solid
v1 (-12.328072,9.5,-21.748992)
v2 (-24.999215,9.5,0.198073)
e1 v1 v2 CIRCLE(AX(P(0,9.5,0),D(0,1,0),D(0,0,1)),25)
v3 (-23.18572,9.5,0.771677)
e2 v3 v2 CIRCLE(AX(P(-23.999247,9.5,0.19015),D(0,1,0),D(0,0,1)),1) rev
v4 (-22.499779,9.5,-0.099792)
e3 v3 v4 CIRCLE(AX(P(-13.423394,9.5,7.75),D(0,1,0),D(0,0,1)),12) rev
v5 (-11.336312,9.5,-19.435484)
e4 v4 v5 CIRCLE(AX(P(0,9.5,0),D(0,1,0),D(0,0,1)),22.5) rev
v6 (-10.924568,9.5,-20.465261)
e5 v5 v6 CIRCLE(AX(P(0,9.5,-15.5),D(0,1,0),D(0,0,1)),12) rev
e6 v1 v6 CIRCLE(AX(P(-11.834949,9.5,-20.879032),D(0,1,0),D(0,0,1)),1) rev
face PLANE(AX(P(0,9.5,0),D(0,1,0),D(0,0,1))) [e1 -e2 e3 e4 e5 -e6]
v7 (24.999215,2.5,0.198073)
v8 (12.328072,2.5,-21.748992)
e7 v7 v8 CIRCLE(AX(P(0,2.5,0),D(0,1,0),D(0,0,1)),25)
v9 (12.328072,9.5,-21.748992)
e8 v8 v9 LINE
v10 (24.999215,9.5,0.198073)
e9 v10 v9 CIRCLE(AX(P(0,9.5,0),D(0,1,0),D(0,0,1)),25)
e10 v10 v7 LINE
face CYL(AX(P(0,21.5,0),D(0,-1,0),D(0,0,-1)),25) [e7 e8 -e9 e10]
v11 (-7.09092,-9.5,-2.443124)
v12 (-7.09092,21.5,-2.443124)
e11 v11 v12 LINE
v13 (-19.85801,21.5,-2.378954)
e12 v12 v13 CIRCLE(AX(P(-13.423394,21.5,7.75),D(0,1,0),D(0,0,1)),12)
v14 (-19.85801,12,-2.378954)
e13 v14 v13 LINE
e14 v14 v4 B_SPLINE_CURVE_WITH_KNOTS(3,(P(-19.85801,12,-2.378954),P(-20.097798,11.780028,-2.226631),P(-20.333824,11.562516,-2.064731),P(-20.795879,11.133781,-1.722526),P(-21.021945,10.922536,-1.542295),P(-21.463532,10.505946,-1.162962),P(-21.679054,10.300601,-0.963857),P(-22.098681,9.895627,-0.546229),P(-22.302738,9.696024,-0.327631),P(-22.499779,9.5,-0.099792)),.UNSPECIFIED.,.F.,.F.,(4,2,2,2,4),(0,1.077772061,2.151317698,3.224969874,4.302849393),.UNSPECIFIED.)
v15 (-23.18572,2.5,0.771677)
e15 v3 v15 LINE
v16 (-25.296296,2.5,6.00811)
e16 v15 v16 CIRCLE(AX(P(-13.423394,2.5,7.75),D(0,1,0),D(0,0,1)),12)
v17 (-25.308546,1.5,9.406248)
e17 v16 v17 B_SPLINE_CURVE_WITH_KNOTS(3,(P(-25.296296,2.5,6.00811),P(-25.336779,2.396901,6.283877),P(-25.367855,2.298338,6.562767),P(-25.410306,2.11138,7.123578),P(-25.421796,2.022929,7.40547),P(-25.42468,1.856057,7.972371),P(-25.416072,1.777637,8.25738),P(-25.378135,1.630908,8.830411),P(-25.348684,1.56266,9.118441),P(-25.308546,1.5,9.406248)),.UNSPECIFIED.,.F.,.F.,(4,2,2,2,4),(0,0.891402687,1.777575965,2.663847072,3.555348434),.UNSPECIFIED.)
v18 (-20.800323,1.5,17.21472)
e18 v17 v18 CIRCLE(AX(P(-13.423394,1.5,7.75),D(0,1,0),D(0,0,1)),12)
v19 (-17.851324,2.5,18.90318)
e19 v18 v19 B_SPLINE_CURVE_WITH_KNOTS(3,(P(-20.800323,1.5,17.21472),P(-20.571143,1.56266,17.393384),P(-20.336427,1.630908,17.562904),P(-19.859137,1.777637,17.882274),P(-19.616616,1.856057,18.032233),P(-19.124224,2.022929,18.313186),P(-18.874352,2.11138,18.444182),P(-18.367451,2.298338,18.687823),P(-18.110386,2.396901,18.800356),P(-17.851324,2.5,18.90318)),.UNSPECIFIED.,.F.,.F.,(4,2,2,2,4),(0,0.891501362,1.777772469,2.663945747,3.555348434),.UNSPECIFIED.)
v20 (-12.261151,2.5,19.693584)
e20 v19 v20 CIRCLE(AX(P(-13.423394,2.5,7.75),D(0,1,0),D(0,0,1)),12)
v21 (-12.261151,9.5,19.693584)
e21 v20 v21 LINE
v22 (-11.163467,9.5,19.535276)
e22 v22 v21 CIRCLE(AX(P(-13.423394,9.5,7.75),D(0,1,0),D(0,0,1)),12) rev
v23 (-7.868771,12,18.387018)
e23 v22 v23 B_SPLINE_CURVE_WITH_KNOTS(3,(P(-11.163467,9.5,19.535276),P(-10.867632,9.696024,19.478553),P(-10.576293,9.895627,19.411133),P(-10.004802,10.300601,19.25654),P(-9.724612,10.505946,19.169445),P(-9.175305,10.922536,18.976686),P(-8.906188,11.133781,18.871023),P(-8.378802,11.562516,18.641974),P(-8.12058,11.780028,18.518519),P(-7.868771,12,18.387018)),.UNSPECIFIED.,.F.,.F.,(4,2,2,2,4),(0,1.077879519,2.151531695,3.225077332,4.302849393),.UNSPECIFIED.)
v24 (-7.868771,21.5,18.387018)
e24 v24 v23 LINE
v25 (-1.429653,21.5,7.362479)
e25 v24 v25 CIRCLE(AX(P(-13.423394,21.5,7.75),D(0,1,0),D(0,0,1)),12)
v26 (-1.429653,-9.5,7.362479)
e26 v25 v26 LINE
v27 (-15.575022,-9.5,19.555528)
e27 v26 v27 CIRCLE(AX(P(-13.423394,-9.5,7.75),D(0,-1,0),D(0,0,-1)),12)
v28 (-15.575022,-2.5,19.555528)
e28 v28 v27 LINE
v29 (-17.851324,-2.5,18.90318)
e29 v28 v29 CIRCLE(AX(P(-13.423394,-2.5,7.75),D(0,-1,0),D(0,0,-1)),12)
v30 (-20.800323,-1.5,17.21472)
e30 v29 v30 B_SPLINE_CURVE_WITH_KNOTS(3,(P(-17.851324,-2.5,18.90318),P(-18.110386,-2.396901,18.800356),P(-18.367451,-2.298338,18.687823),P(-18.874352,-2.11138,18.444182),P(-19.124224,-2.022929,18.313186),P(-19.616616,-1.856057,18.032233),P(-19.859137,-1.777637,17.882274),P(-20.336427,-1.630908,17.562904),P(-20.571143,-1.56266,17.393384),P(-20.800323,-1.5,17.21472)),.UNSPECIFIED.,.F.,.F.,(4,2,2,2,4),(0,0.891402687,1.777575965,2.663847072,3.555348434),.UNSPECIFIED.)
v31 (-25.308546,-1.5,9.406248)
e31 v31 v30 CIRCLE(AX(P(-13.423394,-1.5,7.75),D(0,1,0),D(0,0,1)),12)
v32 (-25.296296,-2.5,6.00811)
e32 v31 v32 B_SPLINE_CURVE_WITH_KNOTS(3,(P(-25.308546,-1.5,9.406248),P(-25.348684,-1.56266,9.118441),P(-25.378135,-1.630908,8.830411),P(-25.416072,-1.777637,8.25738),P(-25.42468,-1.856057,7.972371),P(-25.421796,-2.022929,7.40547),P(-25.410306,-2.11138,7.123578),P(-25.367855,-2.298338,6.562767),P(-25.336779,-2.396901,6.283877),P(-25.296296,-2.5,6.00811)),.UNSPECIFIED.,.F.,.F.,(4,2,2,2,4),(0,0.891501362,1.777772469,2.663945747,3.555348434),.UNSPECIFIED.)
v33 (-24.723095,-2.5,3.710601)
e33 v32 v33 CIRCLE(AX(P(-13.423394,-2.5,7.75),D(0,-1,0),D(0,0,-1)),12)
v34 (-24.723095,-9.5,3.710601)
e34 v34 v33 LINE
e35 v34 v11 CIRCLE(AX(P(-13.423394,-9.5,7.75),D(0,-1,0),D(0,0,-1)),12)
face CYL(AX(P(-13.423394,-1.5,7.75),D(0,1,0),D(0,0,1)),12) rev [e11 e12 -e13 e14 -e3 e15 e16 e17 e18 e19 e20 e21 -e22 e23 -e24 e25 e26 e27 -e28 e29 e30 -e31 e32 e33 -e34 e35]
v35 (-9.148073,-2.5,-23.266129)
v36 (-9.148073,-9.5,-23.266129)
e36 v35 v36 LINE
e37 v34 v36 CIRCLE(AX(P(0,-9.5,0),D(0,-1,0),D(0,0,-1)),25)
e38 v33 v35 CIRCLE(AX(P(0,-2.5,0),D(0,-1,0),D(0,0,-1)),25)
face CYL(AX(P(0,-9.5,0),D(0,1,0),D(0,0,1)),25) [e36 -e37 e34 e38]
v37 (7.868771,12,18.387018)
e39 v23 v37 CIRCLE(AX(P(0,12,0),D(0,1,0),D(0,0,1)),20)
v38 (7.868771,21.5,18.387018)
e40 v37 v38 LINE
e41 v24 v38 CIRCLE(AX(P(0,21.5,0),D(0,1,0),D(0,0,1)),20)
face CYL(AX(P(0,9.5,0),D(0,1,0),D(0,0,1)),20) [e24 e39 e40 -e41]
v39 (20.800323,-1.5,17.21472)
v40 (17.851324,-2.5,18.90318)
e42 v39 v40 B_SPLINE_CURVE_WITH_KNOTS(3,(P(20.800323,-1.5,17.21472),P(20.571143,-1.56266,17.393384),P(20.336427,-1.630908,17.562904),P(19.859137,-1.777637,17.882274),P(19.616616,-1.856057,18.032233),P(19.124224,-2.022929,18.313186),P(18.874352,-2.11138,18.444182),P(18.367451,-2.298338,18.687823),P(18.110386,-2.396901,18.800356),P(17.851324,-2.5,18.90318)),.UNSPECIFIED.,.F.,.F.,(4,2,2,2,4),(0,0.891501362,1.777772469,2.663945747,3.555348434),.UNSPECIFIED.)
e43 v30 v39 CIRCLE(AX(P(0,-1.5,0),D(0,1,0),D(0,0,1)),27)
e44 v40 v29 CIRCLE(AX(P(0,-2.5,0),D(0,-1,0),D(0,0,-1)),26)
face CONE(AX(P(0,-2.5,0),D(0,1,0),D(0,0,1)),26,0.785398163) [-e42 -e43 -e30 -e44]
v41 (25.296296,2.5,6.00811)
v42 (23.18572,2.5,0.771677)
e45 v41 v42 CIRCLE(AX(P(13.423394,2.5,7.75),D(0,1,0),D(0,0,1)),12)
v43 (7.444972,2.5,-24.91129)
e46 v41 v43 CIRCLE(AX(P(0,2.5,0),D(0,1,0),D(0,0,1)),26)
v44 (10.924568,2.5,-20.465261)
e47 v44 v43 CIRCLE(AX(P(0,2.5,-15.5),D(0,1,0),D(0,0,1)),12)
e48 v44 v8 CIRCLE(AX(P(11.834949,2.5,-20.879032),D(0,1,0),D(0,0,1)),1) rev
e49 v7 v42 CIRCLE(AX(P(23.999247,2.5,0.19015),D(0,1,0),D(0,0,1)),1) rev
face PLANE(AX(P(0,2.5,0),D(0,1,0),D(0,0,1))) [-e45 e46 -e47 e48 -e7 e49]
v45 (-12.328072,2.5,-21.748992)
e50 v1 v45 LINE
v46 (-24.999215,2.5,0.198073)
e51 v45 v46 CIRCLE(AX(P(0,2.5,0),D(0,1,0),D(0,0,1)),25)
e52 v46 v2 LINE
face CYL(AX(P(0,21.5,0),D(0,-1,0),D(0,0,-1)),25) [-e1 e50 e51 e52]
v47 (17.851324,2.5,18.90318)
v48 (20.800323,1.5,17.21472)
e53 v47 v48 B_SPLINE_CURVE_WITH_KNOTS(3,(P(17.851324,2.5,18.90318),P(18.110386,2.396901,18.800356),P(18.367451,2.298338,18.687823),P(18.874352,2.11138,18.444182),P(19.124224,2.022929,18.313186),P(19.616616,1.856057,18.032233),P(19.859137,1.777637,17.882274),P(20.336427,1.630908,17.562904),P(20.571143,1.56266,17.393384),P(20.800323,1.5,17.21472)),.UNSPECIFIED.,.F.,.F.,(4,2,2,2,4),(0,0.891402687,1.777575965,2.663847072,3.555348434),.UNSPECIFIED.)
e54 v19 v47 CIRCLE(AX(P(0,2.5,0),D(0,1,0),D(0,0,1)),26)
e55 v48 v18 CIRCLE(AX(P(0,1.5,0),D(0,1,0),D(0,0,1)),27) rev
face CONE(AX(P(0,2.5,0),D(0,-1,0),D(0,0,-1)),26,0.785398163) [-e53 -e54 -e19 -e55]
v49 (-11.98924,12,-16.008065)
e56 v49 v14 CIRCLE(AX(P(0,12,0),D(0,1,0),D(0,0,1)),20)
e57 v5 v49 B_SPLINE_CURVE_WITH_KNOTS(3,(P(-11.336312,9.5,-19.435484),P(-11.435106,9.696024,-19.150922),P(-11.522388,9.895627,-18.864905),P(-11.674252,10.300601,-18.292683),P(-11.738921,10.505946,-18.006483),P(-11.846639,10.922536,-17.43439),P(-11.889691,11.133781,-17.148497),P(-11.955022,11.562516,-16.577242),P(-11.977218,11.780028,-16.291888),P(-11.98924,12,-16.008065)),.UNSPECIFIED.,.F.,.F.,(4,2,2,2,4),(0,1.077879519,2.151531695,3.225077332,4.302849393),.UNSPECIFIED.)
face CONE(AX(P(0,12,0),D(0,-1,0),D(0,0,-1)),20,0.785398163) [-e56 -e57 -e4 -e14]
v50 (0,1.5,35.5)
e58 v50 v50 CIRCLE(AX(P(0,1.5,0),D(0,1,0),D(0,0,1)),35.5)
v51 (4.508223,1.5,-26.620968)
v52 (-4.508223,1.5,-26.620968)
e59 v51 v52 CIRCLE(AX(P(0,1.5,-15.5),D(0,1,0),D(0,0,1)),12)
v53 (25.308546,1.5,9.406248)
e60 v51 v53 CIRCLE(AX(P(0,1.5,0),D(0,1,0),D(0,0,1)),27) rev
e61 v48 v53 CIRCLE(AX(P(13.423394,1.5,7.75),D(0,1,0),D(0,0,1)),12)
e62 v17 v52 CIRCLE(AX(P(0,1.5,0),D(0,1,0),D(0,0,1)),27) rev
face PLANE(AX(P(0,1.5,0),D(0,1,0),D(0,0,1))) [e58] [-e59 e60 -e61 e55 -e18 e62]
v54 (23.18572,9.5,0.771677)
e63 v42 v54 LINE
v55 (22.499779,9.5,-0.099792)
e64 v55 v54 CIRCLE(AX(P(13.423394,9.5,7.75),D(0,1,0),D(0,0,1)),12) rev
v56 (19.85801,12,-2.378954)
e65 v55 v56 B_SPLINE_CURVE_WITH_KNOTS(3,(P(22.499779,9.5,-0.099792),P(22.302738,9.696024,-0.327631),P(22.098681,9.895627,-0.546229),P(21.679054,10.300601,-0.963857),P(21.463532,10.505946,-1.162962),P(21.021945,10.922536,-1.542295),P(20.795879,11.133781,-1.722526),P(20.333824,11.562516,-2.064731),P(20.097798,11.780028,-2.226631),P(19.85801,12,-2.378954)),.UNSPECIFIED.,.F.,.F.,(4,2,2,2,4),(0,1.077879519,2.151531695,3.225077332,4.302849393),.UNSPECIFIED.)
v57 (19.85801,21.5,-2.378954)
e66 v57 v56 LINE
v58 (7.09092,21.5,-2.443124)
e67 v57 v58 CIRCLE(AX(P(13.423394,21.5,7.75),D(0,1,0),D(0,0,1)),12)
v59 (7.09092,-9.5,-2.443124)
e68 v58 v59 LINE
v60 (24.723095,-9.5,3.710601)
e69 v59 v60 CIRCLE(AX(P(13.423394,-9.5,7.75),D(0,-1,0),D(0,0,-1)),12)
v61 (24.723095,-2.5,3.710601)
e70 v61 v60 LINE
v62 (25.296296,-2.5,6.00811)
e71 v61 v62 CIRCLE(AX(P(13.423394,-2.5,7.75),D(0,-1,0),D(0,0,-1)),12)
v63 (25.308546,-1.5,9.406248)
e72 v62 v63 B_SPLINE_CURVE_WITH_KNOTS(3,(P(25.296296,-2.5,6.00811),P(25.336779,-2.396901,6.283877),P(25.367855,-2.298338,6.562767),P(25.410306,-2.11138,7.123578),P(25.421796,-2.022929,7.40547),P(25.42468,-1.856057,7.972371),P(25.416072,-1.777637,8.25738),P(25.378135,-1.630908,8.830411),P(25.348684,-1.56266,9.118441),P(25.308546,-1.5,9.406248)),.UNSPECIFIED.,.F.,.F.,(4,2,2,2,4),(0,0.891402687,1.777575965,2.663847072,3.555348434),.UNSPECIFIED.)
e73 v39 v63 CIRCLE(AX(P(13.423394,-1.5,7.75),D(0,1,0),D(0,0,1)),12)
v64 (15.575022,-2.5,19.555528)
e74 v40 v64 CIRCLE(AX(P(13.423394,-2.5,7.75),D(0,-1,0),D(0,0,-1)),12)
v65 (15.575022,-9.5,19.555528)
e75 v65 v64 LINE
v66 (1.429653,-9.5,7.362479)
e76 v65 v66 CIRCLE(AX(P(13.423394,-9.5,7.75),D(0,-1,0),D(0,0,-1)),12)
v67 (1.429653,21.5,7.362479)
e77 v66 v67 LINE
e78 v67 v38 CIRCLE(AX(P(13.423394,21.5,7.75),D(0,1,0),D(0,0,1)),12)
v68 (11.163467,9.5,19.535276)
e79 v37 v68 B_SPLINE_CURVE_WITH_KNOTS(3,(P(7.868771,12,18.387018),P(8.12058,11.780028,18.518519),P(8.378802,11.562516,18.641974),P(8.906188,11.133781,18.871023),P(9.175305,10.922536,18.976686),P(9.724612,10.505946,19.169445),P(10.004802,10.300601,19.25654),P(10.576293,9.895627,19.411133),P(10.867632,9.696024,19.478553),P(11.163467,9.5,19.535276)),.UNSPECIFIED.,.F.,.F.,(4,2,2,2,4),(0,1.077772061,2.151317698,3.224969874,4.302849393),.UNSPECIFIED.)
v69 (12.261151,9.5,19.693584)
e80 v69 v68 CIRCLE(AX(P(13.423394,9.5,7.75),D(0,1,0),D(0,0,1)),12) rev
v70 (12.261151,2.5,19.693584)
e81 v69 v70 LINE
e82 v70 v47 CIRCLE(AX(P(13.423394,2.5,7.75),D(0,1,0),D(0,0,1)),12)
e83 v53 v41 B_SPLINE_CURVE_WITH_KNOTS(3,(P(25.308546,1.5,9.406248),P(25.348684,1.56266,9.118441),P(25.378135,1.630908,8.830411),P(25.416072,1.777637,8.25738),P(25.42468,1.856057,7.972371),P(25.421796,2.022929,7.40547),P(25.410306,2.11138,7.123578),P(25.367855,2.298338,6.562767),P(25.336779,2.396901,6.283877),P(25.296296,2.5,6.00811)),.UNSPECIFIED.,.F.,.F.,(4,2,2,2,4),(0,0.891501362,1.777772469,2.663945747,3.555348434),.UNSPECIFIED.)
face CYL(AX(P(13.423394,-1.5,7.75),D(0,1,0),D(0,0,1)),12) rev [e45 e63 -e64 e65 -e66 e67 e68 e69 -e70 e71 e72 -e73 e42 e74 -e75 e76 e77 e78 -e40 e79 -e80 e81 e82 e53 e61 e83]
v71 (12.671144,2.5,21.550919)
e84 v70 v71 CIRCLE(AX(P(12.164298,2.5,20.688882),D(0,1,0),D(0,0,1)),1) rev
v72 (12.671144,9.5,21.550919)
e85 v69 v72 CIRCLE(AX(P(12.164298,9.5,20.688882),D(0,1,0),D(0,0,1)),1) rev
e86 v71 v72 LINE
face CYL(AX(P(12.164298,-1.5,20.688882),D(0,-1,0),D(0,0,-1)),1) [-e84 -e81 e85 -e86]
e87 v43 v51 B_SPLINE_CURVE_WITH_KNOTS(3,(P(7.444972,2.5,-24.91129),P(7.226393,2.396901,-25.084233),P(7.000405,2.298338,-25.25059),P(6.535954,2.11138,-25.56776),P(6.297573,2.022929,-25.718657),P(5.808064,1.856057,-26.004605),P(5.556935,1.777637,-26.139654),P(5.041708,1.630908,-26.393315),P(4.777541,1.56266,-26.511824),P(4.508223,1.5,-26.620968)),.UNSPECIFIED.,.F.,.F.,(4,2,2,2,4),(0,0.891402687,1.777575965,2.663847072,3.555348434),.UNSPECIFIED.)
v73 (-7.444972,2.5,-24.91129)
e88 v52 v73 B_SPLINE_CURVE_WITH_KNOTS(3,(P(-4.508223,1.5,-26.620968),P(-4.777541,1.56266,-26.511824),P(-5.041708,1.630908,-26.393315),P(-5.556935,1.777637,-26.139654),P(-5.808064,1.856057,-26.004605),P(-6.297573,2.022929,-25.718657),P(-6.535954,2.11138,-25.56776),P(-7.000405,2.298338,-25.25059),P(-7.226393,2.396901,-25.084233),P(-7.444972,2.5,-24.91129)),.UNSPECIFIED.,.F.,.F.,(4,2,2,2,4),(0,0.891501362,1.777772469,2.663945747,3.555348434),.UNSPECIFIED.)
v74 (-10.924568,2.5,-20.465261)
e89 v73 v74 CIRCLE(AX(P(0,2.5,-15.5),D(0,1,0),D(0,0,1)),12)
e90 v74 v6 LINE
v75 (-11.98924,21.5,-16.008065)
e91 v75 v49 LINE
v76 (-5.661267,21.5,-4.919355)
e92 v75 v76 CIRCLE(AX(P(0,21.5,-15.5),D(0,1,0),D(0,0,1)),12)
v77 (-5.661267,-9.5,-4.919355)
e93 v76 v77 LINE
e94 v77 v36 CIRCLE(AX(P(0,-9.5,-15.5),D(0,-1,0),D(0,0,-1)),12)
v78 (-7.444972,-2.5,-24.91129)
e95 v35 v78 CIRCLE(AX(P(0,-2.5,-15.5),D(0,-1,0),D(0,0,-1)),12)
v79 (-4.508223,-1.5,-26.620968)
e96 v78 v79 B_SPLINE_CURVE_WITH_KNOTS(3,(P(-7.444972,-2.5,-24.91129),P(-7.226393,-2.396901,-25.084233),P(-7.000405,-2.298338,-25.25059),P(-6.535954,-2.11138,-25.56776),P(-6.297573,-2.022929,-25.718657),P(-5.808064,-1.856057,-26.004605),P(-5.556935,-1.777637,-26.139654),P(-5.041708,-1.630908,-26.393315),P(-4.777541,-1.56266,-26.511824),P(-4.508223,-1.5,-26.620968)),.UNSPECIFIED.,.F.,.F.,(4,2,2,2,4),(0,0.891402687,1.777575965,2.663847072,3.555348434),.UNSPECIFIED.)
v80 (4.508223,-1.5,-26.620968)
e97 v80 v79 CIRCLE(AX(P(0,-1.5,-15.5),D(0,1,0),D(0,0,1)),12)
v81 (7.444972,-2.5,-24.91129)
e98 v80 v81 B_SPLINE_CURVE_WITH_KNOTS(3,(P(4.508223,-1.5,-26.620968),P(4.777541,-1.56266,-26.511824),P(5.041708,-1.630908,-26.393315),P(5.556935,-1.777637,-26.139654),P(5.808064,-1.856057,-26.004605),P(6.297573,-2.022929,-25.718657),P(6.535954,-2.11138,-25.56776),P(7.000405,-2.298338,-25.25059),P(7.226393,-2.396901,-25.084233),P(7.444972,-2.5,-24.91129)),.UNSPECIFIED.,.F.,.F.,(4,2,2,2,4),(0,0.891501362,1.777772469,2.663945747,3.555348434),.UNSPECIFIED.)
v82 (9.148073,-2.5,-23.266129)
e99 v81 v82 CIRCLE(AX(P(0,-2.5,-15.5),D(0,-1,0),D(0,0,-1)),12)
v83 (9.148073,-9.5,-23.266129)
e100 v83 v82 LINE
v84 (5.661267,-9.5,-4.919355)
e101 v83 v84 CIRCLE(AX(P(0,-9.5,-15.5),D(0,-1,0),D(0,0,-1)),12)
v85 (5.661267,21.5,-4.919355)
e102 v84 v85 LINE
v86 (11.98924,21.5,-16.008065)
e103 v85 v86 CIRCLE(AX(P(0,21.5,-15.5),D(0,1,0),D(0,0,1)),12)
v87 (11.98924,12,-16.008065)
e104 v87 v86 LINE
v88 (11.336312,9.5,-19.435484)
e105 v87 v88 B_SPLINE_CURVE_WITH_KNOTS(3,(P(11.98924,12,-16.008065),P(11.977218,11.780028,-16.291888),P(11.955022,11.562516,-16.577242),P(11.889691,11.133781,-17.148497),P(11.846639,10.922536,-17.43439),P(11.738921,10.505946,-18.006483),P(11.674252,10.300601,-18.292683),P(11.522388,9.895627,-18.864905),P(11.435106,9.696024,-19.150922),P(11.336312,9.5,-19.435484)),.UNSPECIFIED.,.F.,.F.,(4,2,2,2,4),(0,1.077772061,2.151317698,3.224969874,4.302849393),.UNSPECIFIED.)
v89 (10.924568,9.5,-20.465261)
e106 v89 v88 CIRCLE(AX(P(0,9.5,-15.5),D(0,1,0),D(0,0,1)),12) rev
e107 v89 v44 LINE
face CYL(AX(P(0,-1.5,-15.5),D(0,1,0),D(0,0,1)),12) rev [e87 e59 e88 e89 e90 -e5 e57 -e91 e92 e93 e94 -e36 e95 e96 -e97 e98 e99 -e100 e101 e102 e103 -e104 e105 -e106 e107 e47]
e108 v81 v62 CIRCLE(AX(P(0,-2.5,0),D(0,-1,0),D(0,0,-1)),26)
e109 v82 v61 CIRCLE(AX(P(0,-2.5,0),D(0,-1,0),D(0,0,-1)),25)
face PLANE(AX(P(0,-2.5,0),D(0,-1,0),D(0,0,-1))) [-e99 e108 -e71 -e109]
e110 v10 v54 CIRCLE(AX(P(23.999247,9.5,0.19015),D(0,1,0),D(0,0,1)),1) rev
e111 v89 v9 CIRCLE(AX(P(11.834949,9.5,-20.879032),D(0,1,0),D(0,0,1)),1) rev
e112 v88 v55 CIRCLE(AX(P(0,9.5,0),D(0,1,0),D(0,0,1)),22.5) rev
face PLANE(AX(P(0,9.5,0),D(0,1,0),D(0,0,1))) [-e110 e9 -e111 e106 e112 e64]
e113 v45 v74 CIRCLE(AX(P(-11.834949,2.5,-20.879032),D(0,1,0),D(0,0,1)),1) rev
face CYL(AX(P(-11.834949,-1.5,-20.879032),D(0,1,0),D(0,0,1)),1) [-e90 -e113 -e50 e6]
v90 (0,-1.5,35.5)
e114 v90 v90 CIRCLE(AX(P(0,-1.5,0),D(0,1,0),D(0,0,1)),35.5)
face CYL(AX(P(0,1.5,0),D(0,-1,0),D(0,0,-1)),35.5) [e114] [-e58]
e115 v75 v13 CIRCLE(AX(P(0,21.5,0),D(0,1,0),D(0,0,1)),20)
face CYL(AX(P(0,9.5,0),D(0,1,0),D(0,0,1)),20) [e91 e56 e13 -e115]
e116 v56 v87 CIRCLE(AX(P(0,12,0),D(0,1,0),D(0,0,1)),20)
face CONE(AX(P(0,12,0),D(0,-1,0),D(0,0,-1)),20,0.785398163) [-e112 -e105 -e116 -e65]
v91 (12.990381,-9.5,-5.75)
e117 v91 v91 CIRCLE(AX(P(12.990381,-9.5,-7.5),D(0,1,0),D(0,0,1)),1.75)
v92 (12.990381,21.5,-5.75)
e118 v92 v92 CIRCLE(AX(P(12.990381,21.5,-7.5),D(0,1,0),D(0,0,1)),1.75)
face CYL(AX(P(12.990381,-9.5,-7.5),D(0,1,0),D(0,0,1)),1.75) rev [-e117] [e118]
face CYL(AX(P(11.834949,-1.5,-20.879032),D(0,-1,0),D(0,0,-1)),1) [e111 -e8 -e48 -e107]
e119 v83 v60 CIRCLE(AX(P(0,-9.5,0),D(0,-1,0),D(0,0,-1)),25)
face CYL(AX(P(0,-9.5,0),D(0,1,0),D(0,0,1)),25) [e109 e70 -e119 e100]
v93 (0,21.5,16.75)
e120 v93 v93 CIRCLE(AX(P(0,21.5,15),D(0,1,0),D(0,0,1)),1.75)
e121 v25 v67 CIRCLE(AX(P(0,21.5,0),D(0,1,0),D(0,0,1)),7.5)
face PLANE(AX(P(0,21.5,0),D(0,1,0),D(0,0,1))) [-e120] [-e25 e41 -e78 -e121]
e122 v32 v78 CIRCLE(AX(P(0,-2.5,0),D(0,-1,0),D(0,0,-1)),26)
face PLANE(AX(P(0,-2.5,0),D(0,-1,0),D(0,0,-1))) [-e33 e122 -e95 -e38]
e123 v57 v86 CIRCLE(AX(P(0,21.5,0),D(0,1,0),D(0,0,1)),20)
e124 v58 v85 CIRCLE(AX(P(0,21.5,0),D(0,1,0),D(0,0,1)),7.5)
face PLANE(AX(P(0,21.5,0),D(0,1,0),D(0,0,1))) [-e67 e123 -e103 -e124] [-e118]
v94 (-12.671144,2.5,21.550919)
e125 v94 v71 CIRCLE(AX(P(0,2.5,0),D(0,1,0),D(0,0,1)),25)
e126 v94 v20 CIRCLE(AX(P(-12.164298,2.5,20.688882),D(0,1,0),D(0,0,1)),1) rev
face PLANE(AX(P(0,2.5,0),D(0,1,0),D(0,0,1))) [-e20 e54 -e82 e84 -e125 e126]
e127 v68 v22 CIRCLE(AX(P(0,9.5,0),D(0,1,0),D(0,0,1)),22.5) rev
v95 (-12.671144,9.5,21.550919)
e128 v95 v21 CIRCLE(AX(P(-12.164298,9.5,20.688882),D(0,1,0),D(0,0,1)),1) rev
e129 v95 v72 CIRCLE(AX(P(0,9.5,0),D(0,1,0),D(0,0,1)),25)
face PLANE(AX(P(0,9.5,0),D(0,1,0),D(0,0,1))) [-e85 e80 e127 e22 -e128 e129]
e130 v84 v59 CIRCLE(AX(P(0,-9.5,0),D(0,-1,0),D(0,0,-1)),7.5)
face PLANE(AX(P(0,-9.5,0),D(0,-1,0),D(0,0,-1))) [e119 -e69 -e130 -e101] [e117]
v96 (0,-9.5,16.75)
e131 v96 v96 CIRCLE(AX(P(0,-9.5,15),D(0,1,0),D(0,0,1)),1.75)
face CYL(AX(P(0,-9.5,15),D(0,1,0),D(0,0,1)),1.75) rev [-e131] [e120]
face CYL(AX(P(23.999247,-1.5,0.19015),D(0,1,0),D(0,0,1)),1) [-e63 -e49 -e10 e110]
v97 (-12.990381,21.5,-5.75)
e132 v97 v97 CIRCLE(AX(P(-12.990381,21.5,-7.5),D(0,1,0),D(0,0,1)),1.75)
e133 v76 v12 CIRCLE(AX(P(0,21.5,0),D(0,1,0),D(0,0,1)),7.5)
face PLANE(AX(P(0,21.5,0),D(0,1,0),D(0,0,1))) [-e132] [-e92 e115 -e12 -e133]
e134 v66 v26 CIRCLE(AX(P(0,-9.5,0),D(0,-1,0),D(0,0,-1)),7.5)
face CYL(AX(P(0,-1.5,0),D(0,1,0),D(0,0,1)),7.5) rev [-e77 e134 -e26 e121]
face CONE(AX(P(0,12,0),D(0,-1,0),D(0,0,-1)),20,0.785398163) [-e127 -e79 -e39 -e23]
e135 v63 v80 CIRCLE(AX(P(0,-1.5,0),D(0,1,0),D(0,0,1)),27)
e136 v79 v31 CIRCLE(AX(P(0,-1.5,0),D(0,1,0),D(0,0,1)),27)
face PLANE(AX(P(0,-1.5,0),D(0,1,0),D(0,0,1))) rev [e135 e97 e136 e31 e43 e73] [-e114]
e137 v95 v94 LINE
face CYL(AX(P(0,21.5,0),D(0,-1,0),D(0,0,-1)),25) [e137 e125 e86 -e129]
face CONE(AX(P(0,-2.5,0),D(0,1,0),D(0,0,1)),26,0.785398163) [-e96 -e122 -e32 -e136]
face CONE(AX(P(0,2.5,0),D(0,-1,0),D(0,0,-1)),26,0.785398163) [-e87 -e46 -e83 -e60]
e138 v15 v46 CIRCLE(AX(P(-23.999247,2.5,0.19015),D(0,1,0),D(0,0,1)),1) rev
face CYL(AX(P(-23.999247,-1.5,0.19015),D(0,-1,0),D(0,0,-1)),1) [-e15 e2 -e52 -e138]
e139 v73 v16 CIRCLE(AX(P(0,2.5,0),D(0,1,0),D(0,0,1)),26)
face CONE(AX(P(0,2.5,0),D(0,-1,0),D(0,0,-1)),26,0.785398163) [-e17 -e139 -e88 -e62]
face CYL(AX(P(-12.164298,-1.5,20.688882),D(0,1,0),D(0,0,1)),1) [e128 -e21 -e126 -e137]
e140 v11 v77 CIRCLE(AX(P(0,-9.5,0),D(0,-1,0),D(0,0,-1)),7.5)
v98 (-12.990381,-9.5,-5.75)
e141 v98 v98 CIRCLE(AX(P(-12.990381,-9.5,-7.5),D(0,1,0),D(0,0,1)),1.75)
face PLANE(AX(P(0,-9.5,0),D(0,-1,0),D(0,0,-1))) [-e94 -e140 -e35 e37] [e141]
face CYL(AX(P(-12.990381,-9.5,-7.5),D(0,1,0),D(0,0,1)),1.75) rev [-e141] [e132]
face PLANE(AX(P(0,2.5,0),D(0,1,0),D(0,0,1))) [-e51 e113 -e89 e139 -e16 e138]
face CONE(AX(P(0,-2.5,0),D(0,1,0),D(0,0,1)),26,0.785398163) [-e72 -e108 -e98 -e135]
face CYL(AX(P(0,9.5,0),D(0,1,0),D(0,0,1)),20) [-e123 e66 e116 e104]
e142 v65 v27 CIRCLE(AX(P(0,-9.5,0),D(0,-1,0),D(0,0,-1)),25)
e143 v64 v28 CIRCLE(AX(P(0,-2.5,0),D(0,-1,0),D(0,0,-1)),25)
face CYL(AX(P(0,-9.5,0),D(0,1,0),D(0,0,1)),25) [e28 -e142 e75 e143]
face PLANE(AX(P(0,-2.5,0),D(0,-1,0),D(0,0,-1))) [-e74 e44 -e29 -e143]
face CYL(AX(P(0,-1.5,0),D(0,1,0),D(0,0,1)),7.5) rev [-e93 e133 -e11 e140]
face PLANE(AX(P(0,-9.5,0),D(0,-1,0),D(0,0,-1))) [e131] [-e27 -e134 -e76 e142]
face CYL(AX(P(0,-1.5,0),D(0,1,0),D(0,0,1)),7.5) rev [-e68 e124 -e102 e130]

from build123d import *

# Parameters (mm, degrees)
SKETCH1_R           = 35.5
BOSS_EXTRUDE1_DEPTH = 1.5
SKETCH2_R           = 26
BOSS_EXTRUDE2_DEPTH = 1
SKETCH3_R           = 25
BOSS_EXTRUDE3_DEPTH = 19
SKETCH4_R           = 12
CUT_EXTRUDE1_DEPTH  = 56.222278113
SKETCH5_R           = 7.5
CUT_EXTRUDE2_DEPTH  = 56.222278113
FILLET1_R           = 1
SKETCH6_R           = 30.018937713
SKETCH6_R_2         = 20
CUT_EXTRUDE3_DEPTH  = 12
CHAMFER2_SIZE       = 2.5
BOSS_EXTRUDE4_START = 8
SKETCH8_R           = 25
BOSS_EXTRUDE4_DEPTH = 8
SKETCH10_R          = 7.5
CUT_EXTRUDE6_DEPTH  = 60.004237189
SKETCH7_R           = 1.75
CUT_EXTRUDE4_DEPTH  = 60.004237136
BOSS_EXTRUDE5_START = 1
SKETCH11_R          = 26
SKETCH11_R_2        = 25
BOSS_EXTRUDE5_DEPTH = 1
SKETCH9_R           = 12
CUT_EXTRUDE5_DEPTH  = 60.004237189
CHAMFER1_SIZE       = 1


with BuildPart() as part:
    # Sketch1 → Boss-Extrude1 (new, symmetric)
    with BuildSketch(Plane(origin=(0, 0, 0), x_dir=(1, 0, 0), z_dir=(0, 1, 0))):
        with Locations(Location((0, 0, 0), (0, 0, 270))):
            Circle(SKETCH1_R)
    extrude(amount=BOSS_EXTRUDE1_DEPTH, both=True)

    # Sketch2 → Boss-Extrude2 (add)
    with BuildSketch(Plane(origin=(0, 1.5, 0), x_dir=(1, 0, 0), z_dir=(0, 1, 0))):
        with Locations(Location((0, 0, 0), (0, 0, 270))):
            Circle(SKETCH2_R)
    extrude(amount=BOSS_EXTRUDE2_DEPTH)

    # Sketch3 → Boss-Extrude3 (add)
    with BuildSketch(Plane(origin=(0, 2.5, 0), x_dir=(1, 0, 0), z_dir=(0, 1, 0))):
        with Locations(Location((0, 0, 0), (0, 0, 270))):
            Circle(SKETCH3_R)
    extrude(amount=BOSS_EXTRUDE3_DEPTH)

    # Sketch4 → Cut-Extrude1 (cut, through all)
    with BuildSketch(Plane(origin=(0, 21.5, 0), x_dir=(1, 0, 0), z_dir=(0, 1, 0))):
        with Locations(Location((0, 15.5, 0), (0, 0, 270))):
            Circle(SKETCH4_R)
        with Locations(Location((13.423393759, -7.75, 0), (0, 0, 270))):
            Circle(SKETCH4_R)
        with Locations(Location((-13.423393759, -7.75, 0), (0, 0, 270))):
            Circle(SKETCH4_R)
    extrude(amount=-CUT_EXTRUDE1_DEPTH, mode=Mode.SUBTRACT)

    # Sketch5 → Cut-Extrude2 (cut, through all)
    with BuildSketch(Plane(origin=(0, 21.5, 0), x_dir=(1, 0, 0), z_dir=(0, 1, 0))):
        Circle(SKETCH5_R)
    extrude(amount=-CUT_EXTRUDE2_DEPTH, mode=Mode.SUBTRACT)

    # Fillet1
    fillet1_edges = [part.edges().sort_by_distance(p)[0] for p in [
        (-24.723095296, 12, 3.710600891),
        (-15.575022283, 12, 19.555528141),
        (15.575022283, 12, 19.555528141),
        (24.723095296, 12, 3.710600891),
        (9.148073013, 12, -23.266129032),
        (-9.148073013, 12, -23.266129032),
    ]]
    fillet(fillet1_edges, radius=FILLET1_R)

    # Sketch6 → Cut-Extrude3 (cut)
    with BuildSketch(Plane(origin=(0, 21.5, 0), x_dir=(1, 0, 0), z_dir=(0, 1, 0))):
        Circle(SKETCH6_R)
        Circle(SKETCH6_R_2, mode=Mode.SUBTRACT)
    extrude(amount=-CUT_EXTRUDE3_DEPTH, mode=Mode.SUBTRACT)

    # Chamfer2
    chamfer2_edges = [part.edges().sort_by_distance(p)[0] for p in [
        (17.320508076, 9.5, -10),
        (-17.320508076, 9.5, -10),
        (0, 9.5, 20),
    ]]
    chamfer(chamfer2_edges, length=CHAMFER2_SIZE)

    # Sketch8 → Boss-Extrude4 (add)
    with BuildSketch(Plane.XZ.offset(1.5).offset(BOSS_EXTRUDE4_START)):
        with Locations(Location((0, 0, 0), (0, 0, 51.464391847))):
            Circle(SKETCH8_R)
    extrude(amount=-BOSS_EXTRUDE4_DEPTH)

    # Sketch10 → Cut-Extrude6 (cut, through all)
    with BuildSketch(Plane.XZ.offset(9.5)):
        with Locations(Location((0, 0, 0), (0, 0, 79.011010973))):
            Circle(SKETCH10_R)
    extrude(amount=-CUT_EXTRUDE6_DEPTH, mode=Mode.SUBTRACT)

    # Sketch7 → Cut-Extrude4 (cut, through all)
    with BuildSketch(Plane(origin=(0, 21.5, 0), x_dir=(1, 0, 0), z_dir=(0, 1, 0))):
        with Locations(Location((0, -15, 0), (0, 0, 270))):
            Circle(SKETCH7_R)
        with Locations(Location((-12.990381057, 7.5, 0), (0, 0, 270))):
            Circle(SKETCH7_R)
        with Locations(Location((12.990381057, 7.5, 0), (0, 0, 270))):
            Circle(SKETCH7_R)
    extrude(amount=-CUT_EXTRUDE4_DEPTH, mode=Mode.SUBTRACT)

    # Sketch11 → Boss-Extrude5 (add)
    with BuildSketch(Plane.XZ.offset(1.5).offset(BOSS_EXTRUDE5_START)):
        with Locations(Location((0, 0, 0), (0, 0, 46.639268068))):
            Circle(SKETCH11_R)
        with Locations(Location((0, 0, 0), (0, 0, 270))):
            Circle(SKETCH11_R_2, mode=Mode.SUBTRACT)
    extrude(amount=-BOSS_EXTRUDE5_DEPTH)

    # Sketch9 → Cut-Extrude5 (cut, through all)
    with BuildSketch(Plane.XZ.offset(9.5)):
        with Locations((-13.423393759, 7.75)):
            Circle(SKETCH9_R)
        with Locations((13.423393759, 7.75)):
            Circle(SKETCH9_R)
        with Locations((0, -15.5)):
            Circle(SKETCH9_R)
    extrude(amount=-CUT_EXTRUDE5_DEPTH, mode=Mode.SUBTRACT)

    # Chamfer1
    chamfer1_2_edges = [part.edges().sort_by_distance(p)[0] for p in [
        (-22.516660498, 1.5, -13),
        (22.516660498, 1.5, -13),
        (0, 1.5, 26),
        (22.516660498, -1.5, -13),
        (0, -1.5, 26),
        (-22.516660498, -1.5, -13),
    ]]
    chamfer(chamfer1_2_edges, length=CHAMFER1_SIZE - 0.0001)  # a hair under: the kernel refuses the full size


solid = part.part
